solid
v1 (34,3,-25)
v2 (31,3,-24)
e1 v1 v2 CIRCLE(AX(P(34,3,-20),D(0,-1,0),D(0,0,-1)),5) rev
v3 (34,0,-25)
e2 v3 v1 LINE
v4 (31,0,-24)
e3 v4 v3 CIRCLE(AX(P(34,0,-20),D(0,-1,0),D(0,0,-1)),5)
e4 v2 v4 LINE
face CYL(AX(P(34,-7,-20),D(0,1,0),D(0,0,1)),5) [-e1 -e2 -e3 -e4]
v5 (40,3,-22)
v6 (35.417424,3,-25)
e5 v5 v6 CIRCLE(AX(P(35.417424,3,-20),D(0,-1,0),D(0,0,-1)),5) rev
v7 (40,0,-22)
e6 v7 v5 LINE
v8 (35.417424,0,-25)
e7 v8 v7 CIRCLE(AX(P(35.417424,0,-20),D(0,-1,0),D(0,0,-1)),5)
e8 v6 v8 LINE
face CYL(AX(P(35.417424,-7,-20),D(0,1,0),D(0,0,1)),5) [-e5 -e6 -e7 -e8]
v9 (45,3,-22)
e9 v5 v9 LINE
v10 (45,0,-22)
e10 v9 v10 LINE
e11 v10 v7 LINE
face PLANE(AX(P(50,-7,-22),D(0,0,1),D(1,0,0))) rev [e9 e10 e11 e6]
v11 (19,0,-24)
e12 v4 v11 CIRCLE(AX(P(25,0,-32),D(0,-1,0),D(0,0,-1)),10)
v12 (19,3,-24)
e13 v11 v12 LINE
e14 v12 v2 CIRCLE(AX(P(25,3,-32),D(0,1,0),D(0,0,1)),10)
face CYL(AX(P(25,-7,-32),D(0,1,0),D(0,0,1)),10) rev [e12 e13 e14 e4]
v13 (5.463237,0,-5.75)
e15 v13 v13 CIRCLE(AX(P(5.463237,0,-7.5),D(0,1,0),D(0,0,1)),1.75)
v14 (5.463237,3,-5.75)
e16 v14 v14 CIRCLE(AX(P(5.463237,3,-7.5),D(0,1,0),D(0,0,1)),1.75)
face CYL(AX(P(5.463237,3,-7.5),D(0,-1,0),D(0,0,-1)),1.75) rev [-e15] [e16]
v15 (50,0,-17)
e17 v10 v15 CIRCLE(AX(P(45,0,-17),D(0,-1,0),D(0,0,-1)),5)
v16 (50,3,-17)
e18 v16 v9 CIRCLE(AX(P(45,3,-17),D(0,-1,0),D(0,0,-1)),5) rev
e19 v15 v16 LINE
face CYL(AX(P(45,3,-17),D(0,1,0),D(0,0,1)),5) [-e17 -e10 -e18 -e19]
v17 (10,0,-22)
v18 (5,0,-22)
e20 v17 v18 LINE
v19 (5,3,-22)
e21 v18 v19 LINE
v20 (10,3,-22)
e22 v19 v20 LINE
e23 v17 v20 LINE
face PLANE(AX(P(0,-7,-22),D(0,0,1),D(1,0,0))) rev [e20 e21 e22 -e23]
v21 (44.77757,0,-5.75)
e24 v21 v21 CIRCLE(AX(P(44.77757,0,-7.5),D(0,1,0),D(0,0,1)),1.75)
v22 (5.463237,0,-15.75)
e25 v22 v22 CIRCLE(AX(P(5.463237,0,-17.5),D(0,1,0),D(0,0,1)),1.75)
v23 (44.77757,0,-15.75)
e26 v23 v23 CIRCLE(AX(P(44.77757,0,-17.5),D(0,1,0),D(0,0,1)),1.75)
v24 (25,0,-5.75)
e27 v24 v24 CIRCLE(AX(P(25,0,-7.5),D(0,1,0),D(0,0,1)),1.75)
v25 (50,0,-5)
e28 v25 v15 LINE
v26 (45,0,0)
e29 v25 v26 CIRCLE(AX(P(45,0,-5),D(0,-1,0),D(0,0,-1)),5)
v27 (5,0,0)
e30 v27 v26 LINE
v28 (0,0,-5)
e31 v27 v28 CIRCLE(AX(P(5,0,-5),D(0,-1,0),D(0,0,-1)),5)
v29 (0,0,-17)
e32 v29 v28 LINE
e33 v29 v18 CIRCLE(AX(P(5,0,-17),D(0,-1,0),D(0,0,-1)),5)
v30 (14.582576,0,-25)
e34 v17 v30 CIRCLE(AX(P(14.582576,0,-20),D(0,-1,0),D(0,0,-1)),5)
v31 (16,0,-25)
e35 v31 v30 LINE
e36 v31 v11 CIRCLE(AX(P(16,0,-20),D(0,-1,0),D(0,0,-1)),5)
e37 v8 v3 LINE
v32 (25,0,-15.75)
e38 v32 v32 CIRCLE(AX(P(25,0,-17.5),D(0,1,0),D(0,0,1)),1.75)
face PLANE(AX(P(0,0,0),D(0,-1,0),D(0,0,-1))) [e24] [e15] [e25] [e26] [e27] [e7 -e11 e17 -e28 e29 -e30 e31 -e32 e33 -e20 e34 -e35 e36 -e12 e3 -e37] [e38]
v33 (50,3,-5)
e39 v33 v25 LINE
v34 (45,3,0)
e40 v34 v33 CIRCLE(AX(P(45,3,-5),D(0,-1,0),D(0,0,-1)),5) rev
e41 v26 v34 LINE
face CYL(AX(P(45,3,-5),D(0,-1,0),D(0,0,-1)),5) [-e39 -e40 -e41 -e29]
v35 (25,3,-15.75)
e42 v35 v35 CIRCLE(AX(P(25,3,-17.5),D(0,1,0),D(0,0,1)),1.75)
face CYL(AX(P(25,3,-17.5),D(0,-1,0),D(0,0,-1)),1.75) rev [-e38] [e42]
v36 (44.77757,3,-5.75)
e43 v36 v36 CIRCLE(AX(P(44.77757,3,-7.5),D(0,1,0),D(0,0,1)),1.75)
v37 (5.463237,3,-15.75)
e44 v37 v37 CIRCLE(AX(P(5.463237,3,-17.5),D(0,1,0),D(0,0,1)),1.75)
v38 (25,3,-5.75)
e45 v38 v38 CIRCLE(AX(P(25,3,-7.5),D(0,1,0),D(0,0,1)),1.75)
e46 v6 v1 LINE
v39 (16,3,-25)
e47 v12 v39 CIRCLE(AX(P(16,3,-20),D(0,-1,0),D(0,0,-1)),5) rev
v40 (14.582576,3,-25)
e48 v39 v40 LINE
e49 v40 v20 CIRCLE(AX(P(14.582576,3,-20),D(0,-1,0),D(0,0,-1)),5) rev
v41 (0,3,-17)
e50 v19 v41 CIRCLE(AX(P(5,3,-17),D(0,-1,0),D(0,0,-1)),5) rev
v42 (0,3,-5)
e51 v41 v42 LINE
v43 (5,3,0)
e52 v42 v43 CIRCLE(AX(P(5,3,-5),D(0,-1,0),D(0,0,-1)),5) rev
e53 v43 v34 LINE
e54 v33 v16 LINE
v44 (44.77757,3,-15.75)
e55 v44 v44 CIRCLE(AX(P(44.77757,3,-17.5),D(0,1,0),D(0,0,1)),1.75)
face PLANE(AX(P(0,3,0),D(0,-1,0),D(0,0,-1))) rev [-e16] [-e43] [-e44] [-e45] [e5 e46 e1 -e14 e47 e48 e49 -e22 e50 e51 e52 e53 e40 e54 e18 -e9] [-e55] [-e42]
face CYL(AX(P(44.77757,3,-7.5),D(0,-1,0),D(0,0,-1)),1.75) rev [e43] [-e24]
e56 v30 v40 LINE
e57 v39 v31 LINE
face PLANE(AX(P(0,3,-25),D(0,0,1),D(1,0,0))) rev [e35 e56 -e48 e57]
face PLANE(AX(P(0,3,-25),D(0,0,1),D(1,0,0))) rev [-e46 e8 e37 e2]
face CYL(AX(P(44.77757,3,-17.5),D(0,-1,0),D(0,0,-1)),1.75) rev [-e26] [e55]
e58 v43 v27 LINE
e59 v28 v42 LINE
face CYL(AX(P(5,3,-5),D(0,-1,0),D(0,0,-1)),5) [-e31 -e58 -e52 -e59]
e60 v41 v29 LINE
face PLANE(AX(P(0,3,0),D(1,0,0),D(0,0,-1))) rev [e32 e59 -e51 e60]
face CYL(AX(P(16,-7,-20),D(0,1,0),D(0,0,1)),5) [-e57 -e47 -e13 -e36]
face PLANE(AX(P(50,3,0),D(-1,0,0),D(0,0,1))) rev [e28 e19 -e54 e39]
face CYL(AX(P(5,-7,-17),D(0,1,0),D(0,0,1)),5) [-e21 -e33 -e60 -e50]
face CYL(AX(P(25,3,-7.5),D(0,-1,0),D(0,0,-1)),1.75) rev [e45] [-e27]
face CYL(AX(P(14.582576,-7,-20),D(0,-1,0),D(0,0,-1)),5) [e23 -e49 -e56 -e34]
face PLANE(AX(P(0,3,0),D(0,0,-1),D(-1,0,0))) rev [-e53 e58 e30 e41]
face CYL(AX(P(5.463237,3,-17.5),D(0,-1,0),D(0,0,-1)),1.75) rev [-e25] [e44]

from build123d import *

# Parameters (mm, degrees)
SKETCH1_W           = 50
SKETCH1_H           = 25
SKETCH1_R           = 1.75
BOSS_EXTRUDE1_DEPTH = 3
SKETCH2_R           = 10
SKETCH2_W           = 10
SKETCH2_H           = 3
CUT_EXTRUDE1_DEPTH  = 10
FILLET1_R           = 5


with BuildPart() as part:
    # Sketch1 → Boss-Extrude1 (new body)
    with BuildSketch(Plane(origin=(0, 0, 0), x_dir=(1, 0, 0), z_dir=(0, 1, 0))):
        with Locations((25, 12.5)):
            Rectangle(SKETCH1_W, SKETCH1_H)
        with Locations(Location((25, 17.5, 0), (0, 0, 270))):
            Circle(SKETCH1_R, mode=Mode.SUBTRACT)
        with Locations(Location((25, 7.5, 0), (0, 0, 270))):
            Circle(SKETCH1_R, mode=Mode.SUBTRACT)
        with Locations(Location((5.463236706, 17.5, 0), (0, 0, 270))):
            Circle(SKETCH1_R, mode=Mode.SUBTRACT)
        with Locations(Location((5.463236706, 7.5, 0), (0, 0, 270))):
            Circle(SKETCH1_R, mode=Mode.SUBTRACT)
        with Locations(Location((44.777570027, 7.5, 0), (0, 0, 270))):
            Circle(SKETCH1_R, mode=Mode.SUBTRACT)
        with Locations(Location((44.777570027, 17.5, 0), (0, 0, 270))):
            Circle(SKETCH1_R, mode=Mode.SUBTRACT)
    extrude(amount=BOSS_EXTRUDE1_DEPTH)

    # Sketch2 → Cut-Extrude1 (cut)
    with BuildSketch(Plane(origin=(0, 3, 0), x_dir=(1, 0, 0), z_dir=(0, 1, 0))):
        with Locations((25, 32)):
            Circle(SKETCH2_R)
        with Locations((5, 23.5)):
            Rectangle(SKETCH2_W, SKETCH2_H)
        with Locations((45, 23.5)):
            Rectangle(SKETCH2_W, SKETCH2_H)
    extrude(amount=-CUT_EXTRUDE1_DEPTH, mode=Mode.SUBTRACT)

    # Fillet1
    # the kernel refuses this fillet: 5 mm, written as the material it takes off along each edge
    with BuildSketch(Plane(origin=(50, -12.5, 0), x_dir=(-1, 0, 0), z_dir=(0, 1, 0)), Plane(origin=(0, 15.5, -22), x_dir=(0, 0, 1), z_dir=(0, -1, 0))) as fillet1_piece_1:
        with BuildLine():
            CenterArc((FILLET1_R, -FILLET1_R), FILLET1_R, 90, 90)
            Line((0, -FILLET1_R), (-FILLET1_R * 0.02, -FILLET1_R))
            Line((-FILLET1_R * 0.02, -FILLET1_R), (-FILLET1_R * 0.02, FILLET1_R * 0.02))
            Line((-FILLET1_R * 0.02, FILLET1_R * 0.02), (FILLET1_R, FILLET1_R * 0.02))
            Line((FILLET1_R, FILLET1_R * 0.02), (FILLET1_R, 0))
        make_face()
    extrude(amount=28, mode=Mode.SUBTRACT)
    with BuildSketch(Plane(origin=(0, -12.5, 0), x_dir=(1, 0, 0), z_dir=(0, 1, 0)), Plane(origin=(50, 15.5, -22), x_dir=(0, 0, 1), z_dir=(0, -1, 0))) as fillet1_piece_2:
        with BuildLine():
            CenterArc((FILLET1_R, FILLET1_R), FILLET1_R, 180, 90)
            Line((0, FILLET1_R), (-FILLET1_R * 0.02, FILLET1_R))
            Line((-FILLET1_R * 0.02, FILLET1_R), (-FILLET1_R * 0.02, -FILLET1_R * 0.02))
            Line((-FILLET1_R * 0.02, -FILLET1_R * 0.02), (FILLET1_R, -FILLET1_R * 0.02))
            Line((FILLET1_R, -FILLET1_R * 0.02), (FILLET1_R, 0))
        make_face()
    extrude(amount=28, mode=Mode.SUBTRACT)
    with BuildSketch(Plane(origin=(40, 14.456439237, -25), x_dir=(-1, 0, 0), z_dir=(0, -1, 0))) as fillet1_piece_3:
        with BuildLine():
            CenterArc((4.582575695, -5), FILLET1_R, 90, 66.421821522)
            Line((0, -3), (-0.091651514, -2.96))
            ThreePointArc((-0.091651514, -2.96), (-0.1, -1.5), (-0.1, 0))
            Line((-0.1, 0), (0, 0.1))
            Line((0, 0.1), (4.582575695, 0.1))
            Line((4.582575695, 0.1), (4.582575695, 0))
        make_face()
    extrude(amount=25.912878475, mode=Mode.SUBTRACT)
    with BuildSketch(Plane(origin=(10, 14.456439237, -25), x_dir=(0, 0, 1), z_dir=(0, -1, 0))) as fillet1_piece_4:
        with BuildLine():
            CenterArc((5, -4.582575695), FILLET1_R, 113.578178478, 66.421821522)
            Line((0, -4.582575695), (-0.1, -4.582575695))
            Line((-0.1, -4.582575695), (-0.1, 0))
            Line((-0.1, 0), (0, 0.1))
            ThreePointArc((0, 0.1), (1.5, 0.1), (2.96, 0.091651514))
            Line((2.96, 0.091651514), (3, 0))
        make_face()
    extrude(amount=25.912878475, mode=Mode.SUBTRACT)
    with BuildSketch(Plane(origin=(17.858571571, -4.646428929, -25), x_dir=(-1, 0, 0), z_dir=(0, 1, 0))) as fillet1_piece_5:
        with BuildLine():
            CenterArc((1.858571571, 5), FILLET1_R, 233.130102354, 36.869897646)
            Line((-1.141428429, 1), (-1.201428429, 0.92))
            ThreePointArc((-1.201428429, 0.92), (-0.617614973, 0.446466141), (-0.071414284, -0.07))
            Line((-0.071414284, -0.07), (0, -0.1))
            Line((0, -0.1), (1.858571571, -0.1))
            Line((1.858571571, -0.1), (1.858571571, 0))
        make_face()
    extrude(amount=12.292857857, mode=Mode.SUBTRACT)
    with BuildSketch(Plane(origin=(32.141428429, -4.646428929, -25), x_dir=(-0.7521682970876359, 0, 0.658971056159742), z_dir=(0, 1, 0))) as fillet1_piece_6:
        with BuildLine():
            CenterArc((1.896896667, 4.985586357), FILLET1_R, 228.778553177, 36.869897646)
            Line((-1.397958614, 1.224744871), (-1.46385572, 1.149528042))
            Line((-1.46385572, 1.149528042), (-0.065897106, -0.07521683))
            Line((-0.065897106, -0.07521683), (0.007587587, -0.099711727))
            ThreePointArc((0.007587587, -0.099711727), (0.758758667, -0.071172714), (1.509929747, -0.099711727))
            Line((1.509929747, -0.099711727), (1.517517334, 0))
        make_face()
    extrude(amount=12.292857857, mode=Mode.SUBTRACT)


solid = part.part
